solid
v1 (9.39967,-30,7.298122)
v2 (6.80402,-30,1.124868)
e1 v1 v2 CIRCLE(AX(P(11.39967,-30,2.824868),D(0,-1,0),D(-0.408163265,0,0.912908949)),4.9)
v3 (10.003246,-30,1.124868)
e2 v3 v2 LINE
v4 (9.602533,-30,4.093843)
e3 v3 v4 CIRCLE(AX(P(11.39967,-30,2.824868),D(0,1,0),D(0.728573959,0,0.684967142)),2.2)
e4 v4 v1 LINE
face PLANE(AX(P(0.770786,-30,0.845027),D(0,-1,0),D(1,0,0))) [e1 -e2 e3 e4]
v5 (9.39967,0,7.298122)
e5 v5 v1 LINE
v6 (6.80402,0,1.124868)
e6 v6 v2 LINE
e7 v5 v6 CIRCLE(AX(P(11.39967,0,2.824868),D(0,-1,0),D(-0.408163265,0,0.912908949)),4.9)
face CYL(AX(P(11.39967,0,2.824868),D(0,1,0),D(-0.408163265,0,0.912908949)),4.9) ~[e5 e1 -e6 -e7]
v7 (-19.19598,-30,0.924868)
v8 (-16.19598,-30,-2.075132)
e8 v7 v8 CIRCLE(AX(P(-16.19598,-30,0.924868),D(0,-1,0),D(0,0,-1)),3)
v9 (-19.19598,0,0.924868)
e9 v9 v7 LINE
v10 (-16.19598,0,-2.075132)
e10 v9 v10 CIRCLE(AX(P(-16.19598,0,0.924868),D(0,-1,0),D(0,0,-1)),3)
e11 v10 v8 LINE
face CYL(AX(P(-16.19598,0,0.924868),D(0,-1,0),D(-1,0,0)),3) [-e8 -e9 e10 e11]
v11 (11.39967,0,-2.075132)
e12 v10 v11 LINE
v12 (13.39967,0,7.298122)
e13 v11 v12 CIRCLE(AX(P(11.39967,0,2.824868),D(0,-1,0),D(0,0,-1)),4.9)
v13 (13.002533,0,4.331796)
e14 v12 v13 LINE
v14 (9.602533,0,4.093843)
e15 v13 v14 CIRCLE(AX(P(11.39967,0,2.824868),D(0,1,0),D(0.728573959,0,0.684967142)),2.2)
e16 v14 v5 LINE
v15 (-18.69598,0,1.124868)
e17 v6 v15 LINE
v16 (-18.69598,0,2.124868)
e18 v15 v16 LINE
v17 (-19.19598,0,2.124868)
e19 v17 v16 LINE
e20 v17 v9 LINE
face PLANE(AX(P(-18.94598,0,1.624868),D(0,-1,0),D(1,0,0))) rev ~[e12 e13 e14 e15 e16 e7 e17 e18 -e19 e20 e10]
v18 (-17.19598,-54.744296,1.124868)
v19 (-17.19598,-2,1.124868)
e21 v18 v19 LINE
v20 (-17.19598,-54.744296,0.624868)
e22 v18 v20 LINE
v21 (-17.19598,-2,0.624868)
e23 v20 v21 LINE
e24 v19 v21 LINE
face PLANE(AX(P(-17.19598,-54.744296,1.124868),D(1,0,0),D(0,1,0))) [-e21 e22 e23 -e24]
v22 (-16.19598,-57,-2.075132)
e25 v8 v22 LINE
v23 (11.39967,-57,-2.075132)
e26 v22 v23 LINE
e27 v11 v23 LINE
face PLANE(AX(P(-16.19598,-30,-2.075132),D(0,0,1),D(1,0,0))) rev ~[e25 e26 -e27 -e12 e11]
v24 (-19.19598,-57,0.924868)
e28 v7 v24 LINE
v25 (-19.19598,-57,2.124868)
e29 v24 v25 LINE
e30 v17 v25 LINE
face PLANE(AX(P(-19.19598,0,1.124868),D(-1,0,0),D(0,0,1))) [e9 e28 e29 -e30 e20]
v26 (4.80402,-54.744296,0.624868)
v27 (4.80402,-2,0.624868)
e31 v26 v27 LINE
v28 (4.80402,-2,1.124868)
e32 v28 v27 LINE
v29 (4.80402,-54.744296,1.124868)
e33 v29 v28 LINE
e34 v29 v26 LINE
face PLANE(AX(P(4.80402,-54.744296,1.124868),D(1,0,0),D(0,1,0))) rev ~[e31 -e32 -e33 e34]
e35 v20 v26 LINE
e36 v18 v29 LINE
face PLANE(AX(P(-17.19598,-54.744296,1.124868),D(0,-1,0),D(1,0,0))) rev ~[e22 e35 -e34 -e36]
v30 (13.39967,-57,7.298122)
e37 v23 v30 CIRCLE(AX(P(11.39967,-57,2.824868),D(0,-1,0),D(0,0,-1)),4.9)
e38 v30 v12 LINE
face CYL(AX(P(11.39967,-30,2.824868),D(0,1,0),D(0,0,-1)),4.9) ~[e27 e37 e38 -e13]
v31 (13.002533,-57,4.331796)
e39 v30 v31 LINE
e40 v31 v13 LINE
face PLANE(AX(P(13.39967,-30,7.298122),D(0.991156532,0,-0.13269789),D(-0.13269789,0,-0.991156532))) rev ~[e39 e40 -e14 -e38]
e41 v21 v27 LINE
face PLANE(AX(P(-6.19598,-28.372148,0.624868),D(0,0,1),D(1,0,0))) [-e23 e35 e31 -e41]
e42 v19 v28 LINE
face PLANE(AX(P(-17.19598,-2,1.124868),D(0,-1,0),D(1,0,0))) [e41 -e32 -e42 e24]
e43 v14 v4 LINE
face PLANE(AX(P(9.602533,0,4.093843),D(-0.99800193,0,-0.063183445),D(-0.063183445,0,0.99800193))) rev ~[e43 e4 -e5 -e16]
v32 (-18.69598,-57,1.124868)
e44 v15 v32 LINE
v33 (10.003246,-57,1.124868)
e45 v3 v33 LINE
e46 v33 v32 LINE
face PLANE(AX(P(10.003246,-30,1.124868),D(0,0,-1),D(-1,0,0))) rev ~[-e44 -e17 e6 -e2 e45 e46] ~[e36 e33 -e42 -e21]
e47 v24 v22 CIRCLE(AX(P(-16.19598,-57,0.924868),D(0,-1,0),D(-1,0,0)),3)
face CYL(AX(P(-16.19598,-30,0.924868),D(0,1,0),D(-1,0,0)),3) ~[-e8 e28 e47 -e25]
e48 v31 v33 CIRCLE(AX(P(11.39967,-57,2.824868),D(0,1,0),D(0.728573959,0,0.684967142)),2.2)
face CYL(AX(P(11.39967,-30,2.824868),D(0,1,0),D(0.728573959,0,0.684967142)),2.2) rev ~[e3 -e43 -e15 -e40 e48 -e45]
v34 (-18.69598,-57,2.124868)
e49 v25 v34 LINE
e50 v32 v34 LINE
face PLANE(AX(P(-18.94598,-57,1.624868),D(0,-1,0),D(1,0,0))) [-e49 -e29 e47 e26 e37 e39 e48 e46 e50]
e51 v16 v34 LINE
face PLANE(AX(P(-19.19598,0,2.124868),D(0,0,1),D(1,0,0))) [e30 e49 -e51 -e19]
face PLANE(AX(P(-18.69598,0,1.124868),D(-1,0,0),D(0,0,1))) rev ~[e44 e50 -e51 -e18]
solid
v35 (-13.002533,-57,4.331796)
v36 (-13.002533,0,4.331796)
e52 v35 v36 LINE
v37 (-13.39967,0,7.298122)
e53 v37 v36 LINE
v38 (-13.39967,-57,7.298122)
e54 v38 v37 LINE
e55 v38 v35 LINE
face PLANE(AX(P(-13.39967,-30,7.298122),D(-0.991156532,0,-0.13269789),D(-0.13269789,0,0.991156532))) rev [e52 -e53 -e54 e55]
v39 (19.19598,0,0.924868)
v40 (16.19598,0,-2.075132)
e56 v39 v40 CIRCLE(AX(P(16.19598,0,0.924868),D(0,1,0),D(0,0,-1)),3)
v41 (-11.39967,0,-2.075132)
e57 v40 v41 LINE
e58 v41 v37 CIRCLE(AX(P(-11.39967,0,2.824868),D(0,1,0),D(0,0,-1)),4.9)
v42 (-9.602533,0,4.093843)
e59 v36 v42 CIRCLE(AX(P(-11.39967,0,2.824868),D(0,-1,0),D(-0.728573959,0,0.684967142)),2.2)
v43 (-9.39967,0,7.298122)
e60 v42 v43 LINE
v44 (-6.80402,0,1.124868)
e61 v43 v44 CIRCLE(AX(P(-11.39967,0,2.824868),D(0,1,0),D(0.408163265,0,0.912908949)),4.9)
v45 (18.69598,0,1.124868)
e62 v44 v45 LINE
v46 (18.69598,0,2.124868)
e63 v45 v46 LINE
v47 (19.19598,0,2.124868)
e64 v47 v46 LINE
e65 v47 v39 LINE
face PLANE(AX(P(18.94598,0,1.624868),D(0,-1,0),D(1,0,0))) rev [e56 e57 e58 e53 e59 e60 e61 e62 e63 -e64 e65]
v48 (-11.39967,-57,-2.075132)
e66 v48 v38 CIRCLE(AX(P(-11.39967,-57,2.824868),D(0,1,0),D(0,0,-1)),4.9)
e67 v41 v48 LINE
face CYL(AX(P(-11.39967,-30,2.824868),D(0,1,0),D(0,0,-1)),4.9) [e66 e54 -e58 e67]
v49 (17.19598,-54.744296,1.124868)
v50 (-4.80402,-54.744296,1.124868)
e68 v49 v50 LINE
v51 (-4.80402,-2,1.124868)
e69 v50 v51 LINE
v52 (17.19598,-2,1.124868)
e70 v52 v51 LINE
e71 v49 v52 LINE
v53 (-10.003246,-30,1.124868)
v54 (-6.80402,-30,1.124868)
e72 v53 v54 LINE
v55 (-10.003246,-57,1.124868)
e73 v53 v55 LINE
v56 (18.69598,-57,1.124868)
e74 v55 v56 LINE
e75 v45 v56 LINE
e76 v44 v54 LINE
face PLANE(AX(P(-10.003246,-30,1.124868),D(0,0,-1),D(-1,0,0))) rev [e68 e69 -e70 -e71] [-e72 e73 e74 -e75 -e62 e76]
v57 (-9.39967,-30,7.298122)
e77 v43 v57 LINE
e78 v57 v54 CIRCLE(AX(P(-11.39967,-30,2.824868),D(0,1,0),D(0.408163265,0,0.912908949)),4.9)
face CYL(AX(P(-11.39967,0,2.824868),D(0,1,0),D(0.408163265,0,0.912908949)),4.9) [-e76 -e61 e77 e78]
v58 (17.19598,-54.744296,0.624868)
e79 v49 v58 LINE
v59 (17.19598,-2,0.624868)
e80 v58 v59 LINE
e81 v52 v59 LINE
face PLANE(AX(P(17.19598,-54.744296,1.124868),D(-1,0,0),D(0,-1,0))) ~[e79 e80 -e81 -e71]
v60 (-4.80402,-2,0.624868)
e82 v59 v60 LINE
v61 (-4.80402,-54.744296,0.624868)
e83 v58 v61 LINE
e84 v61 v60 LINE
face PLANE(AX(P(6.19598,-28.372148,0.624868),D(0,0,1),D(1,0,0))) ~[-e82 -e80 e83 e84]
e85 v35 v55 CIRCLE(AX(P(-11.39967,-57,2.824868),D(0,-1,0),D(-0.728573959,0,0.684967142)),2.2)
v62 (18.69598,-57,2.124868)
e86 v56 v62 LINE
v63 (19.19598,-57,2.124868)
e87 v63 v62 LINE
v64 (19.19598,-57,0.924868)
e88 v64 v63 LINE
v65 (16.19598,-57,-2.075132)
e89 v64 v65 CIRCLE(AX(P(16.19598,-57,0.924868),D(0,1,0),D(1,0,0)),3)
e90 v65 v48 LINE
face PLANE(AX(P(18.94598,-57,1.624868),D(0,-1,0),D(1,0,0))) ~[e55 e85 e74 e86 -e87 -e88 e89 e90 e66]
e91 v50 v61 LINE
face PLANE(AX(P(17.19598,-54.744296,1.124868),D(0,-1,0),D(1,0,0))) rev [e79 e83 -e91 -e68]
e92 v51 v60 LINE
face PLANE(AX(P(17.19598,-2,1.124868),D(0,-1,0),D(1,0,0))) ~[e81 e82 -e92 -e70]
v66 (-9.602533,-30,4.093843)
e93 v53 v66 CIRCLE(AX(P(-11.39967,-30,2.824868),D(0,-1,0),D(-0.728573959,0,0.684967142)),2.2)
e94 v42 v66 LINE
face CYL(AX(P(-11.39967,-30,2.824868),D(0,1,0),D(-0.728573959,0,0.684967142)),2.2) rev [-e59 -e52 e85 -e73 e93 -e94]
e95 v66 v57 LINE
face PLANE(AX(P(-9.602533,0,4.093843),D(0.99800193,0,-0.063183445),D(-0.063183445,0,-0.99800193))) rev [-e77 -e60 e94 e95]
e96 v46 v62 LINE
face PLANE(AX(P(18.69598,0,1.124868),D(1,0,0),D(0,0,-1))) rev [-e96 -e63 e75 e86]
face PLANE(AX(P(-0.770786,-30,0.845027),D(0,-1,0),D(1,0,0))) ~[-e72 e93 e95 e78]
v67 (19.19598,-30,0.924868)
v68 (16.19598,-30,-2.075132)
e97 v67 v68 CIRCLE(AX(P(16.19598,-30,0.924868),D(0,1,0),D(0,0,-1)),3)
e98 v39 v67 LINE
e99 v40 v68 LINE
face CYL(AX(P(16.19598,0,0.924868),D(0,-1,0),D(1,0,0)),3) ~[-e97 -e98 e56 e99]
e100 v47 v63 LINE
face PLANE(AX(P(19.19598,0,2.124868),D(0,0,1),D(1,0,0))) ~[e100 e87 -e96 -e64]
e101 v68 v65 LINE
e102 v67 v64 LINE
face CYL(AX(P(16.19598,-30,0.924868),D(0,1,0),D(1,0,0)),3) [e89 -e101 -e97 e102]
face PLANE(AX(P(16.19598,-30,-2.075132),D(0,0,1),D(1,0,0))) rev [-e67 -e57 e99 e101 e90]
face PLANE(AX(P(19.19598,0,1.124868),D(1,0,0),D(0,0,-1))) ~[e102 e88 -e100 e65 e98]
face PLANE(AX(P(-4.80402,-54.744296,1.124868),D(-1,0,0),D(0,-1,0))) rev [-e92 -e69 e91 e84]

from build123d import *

# Parameters (mm, degrees)
F1_DEPTH = 30
F2_R     = 3
F4_DEPTH = 27
F5_W     = 22
F5_H     = 52.7442957759
F6_DEPTH = 0.5
F0_W     = 0.5
F0_H     = 1
F7_DEPTH = 57


# Not quite as in the source:
# - a feature names something its author has since deleted; it is built from what else it names


with BuildPart() as f1:
    # F0 (on Front) → F1 (new body)
    with BuildSketch(Plane.XZ):
        with BuildLine():
            Line((-18.695979941, 1.1248678452), (-19.195979941, 1.1248678452))
            Line((-19.195979941, 1.1248678452), (-19.195979941, -2.0751321548))
            Line((-19.195979941, -2.0751321548), (11.3996701762, -2.0751321548))
            ThreePointArc((11.3996701762, -2.0751321548), (16.1917962107, 1.8023571757), (13.3996701762, 7.2981216945))
            Line((13.3996701762, 7.2981216945), (13.0025328865, 4.3317955581))
            ThreePointArc((13.0025328865, 4.3317955581), (11.5532638802, 0.6302359913), (9.6025328865, 4.0938428497))
            Line((9.6025328865, 4.0938428497), (9.3996701762, 7.2981216945))
            ThreePointArc((9.3996701762, 7.2981216945), (6.8827114771, 4.724100351), (6.804020059, 1.1248678452))
            Line((6.804020059, 1.1248678452), (-18.695979941, 1.1248678452))
        make_face()
    extrude(amount=F1_DEPTH)

    # F2
    f2_edges = [f1.edges().sort_by_distance(p)[0] for p in [
        (-19.19598, -15, -2.075132),
    ]]
    fillet(f2_edges, radius=F2_R)

    # F3 (on face) → F4 (join)
    with BuildSketch(Plane.XZ.offset(30)):
        with BuildLine():
            Line((10.0032461718, 1.1248678452), (6.804020059, 1.1248678452))
            Line((6.804020059, 1.1248678452), (-19.195979941, 1.1248678452))
            Line((-19.195979941, 1.1248678452), (-19.195979941, 0.9248678452))
            ThreePointArc((-19.195979941, 0.9248678452), (-18.3173002846, -1.1964524984), (-16.195979941, -2.0751321548))
            Line((-16.195979941, -2.0751321548), (11.3996701762, -2.0751321548))
            ThreePointArc((11.3996701762, -2.0751321548), (16.1917962107, 1.8023571757), (13.3996701762, 7.2981216945))
            Line((13.3996701762, 7.2981216945), (13.0025328865, 4.3317955581))
            ThreePointArc((13.0025328865, 4.3317955581), (13.006452854, 1.3221205523), (10.0032461718, 1.1248678452))
        make_face()
    extrude(amount=F4_DEPTH)

    # F5 (on face) → F6 (cut)
    with BuildSketch(Plane.XY.offset(1.1248678452)):
        with Locations((-6.195979941, -28.3721478879)):
            Rectangle(F5_W, F5_H)
    extrude(amount=-F6_DEPTH, mode=Mode.SUBTRACT)

    # F0 (on Front) → F7 (join)
    with BuildSketch(Plane.XZ):
        with Locations((-18.945979941, 1.6248678452)):
            Rectangle(F0_W, F0_H)
    extrude(amount=F7_DEPTH)


with BuildPart() as f8_1:
    # F8: instance of F1
    add(f1.part.mirror(Plane.YZ))


solid = Compound([f1.part, f8_1.part])
